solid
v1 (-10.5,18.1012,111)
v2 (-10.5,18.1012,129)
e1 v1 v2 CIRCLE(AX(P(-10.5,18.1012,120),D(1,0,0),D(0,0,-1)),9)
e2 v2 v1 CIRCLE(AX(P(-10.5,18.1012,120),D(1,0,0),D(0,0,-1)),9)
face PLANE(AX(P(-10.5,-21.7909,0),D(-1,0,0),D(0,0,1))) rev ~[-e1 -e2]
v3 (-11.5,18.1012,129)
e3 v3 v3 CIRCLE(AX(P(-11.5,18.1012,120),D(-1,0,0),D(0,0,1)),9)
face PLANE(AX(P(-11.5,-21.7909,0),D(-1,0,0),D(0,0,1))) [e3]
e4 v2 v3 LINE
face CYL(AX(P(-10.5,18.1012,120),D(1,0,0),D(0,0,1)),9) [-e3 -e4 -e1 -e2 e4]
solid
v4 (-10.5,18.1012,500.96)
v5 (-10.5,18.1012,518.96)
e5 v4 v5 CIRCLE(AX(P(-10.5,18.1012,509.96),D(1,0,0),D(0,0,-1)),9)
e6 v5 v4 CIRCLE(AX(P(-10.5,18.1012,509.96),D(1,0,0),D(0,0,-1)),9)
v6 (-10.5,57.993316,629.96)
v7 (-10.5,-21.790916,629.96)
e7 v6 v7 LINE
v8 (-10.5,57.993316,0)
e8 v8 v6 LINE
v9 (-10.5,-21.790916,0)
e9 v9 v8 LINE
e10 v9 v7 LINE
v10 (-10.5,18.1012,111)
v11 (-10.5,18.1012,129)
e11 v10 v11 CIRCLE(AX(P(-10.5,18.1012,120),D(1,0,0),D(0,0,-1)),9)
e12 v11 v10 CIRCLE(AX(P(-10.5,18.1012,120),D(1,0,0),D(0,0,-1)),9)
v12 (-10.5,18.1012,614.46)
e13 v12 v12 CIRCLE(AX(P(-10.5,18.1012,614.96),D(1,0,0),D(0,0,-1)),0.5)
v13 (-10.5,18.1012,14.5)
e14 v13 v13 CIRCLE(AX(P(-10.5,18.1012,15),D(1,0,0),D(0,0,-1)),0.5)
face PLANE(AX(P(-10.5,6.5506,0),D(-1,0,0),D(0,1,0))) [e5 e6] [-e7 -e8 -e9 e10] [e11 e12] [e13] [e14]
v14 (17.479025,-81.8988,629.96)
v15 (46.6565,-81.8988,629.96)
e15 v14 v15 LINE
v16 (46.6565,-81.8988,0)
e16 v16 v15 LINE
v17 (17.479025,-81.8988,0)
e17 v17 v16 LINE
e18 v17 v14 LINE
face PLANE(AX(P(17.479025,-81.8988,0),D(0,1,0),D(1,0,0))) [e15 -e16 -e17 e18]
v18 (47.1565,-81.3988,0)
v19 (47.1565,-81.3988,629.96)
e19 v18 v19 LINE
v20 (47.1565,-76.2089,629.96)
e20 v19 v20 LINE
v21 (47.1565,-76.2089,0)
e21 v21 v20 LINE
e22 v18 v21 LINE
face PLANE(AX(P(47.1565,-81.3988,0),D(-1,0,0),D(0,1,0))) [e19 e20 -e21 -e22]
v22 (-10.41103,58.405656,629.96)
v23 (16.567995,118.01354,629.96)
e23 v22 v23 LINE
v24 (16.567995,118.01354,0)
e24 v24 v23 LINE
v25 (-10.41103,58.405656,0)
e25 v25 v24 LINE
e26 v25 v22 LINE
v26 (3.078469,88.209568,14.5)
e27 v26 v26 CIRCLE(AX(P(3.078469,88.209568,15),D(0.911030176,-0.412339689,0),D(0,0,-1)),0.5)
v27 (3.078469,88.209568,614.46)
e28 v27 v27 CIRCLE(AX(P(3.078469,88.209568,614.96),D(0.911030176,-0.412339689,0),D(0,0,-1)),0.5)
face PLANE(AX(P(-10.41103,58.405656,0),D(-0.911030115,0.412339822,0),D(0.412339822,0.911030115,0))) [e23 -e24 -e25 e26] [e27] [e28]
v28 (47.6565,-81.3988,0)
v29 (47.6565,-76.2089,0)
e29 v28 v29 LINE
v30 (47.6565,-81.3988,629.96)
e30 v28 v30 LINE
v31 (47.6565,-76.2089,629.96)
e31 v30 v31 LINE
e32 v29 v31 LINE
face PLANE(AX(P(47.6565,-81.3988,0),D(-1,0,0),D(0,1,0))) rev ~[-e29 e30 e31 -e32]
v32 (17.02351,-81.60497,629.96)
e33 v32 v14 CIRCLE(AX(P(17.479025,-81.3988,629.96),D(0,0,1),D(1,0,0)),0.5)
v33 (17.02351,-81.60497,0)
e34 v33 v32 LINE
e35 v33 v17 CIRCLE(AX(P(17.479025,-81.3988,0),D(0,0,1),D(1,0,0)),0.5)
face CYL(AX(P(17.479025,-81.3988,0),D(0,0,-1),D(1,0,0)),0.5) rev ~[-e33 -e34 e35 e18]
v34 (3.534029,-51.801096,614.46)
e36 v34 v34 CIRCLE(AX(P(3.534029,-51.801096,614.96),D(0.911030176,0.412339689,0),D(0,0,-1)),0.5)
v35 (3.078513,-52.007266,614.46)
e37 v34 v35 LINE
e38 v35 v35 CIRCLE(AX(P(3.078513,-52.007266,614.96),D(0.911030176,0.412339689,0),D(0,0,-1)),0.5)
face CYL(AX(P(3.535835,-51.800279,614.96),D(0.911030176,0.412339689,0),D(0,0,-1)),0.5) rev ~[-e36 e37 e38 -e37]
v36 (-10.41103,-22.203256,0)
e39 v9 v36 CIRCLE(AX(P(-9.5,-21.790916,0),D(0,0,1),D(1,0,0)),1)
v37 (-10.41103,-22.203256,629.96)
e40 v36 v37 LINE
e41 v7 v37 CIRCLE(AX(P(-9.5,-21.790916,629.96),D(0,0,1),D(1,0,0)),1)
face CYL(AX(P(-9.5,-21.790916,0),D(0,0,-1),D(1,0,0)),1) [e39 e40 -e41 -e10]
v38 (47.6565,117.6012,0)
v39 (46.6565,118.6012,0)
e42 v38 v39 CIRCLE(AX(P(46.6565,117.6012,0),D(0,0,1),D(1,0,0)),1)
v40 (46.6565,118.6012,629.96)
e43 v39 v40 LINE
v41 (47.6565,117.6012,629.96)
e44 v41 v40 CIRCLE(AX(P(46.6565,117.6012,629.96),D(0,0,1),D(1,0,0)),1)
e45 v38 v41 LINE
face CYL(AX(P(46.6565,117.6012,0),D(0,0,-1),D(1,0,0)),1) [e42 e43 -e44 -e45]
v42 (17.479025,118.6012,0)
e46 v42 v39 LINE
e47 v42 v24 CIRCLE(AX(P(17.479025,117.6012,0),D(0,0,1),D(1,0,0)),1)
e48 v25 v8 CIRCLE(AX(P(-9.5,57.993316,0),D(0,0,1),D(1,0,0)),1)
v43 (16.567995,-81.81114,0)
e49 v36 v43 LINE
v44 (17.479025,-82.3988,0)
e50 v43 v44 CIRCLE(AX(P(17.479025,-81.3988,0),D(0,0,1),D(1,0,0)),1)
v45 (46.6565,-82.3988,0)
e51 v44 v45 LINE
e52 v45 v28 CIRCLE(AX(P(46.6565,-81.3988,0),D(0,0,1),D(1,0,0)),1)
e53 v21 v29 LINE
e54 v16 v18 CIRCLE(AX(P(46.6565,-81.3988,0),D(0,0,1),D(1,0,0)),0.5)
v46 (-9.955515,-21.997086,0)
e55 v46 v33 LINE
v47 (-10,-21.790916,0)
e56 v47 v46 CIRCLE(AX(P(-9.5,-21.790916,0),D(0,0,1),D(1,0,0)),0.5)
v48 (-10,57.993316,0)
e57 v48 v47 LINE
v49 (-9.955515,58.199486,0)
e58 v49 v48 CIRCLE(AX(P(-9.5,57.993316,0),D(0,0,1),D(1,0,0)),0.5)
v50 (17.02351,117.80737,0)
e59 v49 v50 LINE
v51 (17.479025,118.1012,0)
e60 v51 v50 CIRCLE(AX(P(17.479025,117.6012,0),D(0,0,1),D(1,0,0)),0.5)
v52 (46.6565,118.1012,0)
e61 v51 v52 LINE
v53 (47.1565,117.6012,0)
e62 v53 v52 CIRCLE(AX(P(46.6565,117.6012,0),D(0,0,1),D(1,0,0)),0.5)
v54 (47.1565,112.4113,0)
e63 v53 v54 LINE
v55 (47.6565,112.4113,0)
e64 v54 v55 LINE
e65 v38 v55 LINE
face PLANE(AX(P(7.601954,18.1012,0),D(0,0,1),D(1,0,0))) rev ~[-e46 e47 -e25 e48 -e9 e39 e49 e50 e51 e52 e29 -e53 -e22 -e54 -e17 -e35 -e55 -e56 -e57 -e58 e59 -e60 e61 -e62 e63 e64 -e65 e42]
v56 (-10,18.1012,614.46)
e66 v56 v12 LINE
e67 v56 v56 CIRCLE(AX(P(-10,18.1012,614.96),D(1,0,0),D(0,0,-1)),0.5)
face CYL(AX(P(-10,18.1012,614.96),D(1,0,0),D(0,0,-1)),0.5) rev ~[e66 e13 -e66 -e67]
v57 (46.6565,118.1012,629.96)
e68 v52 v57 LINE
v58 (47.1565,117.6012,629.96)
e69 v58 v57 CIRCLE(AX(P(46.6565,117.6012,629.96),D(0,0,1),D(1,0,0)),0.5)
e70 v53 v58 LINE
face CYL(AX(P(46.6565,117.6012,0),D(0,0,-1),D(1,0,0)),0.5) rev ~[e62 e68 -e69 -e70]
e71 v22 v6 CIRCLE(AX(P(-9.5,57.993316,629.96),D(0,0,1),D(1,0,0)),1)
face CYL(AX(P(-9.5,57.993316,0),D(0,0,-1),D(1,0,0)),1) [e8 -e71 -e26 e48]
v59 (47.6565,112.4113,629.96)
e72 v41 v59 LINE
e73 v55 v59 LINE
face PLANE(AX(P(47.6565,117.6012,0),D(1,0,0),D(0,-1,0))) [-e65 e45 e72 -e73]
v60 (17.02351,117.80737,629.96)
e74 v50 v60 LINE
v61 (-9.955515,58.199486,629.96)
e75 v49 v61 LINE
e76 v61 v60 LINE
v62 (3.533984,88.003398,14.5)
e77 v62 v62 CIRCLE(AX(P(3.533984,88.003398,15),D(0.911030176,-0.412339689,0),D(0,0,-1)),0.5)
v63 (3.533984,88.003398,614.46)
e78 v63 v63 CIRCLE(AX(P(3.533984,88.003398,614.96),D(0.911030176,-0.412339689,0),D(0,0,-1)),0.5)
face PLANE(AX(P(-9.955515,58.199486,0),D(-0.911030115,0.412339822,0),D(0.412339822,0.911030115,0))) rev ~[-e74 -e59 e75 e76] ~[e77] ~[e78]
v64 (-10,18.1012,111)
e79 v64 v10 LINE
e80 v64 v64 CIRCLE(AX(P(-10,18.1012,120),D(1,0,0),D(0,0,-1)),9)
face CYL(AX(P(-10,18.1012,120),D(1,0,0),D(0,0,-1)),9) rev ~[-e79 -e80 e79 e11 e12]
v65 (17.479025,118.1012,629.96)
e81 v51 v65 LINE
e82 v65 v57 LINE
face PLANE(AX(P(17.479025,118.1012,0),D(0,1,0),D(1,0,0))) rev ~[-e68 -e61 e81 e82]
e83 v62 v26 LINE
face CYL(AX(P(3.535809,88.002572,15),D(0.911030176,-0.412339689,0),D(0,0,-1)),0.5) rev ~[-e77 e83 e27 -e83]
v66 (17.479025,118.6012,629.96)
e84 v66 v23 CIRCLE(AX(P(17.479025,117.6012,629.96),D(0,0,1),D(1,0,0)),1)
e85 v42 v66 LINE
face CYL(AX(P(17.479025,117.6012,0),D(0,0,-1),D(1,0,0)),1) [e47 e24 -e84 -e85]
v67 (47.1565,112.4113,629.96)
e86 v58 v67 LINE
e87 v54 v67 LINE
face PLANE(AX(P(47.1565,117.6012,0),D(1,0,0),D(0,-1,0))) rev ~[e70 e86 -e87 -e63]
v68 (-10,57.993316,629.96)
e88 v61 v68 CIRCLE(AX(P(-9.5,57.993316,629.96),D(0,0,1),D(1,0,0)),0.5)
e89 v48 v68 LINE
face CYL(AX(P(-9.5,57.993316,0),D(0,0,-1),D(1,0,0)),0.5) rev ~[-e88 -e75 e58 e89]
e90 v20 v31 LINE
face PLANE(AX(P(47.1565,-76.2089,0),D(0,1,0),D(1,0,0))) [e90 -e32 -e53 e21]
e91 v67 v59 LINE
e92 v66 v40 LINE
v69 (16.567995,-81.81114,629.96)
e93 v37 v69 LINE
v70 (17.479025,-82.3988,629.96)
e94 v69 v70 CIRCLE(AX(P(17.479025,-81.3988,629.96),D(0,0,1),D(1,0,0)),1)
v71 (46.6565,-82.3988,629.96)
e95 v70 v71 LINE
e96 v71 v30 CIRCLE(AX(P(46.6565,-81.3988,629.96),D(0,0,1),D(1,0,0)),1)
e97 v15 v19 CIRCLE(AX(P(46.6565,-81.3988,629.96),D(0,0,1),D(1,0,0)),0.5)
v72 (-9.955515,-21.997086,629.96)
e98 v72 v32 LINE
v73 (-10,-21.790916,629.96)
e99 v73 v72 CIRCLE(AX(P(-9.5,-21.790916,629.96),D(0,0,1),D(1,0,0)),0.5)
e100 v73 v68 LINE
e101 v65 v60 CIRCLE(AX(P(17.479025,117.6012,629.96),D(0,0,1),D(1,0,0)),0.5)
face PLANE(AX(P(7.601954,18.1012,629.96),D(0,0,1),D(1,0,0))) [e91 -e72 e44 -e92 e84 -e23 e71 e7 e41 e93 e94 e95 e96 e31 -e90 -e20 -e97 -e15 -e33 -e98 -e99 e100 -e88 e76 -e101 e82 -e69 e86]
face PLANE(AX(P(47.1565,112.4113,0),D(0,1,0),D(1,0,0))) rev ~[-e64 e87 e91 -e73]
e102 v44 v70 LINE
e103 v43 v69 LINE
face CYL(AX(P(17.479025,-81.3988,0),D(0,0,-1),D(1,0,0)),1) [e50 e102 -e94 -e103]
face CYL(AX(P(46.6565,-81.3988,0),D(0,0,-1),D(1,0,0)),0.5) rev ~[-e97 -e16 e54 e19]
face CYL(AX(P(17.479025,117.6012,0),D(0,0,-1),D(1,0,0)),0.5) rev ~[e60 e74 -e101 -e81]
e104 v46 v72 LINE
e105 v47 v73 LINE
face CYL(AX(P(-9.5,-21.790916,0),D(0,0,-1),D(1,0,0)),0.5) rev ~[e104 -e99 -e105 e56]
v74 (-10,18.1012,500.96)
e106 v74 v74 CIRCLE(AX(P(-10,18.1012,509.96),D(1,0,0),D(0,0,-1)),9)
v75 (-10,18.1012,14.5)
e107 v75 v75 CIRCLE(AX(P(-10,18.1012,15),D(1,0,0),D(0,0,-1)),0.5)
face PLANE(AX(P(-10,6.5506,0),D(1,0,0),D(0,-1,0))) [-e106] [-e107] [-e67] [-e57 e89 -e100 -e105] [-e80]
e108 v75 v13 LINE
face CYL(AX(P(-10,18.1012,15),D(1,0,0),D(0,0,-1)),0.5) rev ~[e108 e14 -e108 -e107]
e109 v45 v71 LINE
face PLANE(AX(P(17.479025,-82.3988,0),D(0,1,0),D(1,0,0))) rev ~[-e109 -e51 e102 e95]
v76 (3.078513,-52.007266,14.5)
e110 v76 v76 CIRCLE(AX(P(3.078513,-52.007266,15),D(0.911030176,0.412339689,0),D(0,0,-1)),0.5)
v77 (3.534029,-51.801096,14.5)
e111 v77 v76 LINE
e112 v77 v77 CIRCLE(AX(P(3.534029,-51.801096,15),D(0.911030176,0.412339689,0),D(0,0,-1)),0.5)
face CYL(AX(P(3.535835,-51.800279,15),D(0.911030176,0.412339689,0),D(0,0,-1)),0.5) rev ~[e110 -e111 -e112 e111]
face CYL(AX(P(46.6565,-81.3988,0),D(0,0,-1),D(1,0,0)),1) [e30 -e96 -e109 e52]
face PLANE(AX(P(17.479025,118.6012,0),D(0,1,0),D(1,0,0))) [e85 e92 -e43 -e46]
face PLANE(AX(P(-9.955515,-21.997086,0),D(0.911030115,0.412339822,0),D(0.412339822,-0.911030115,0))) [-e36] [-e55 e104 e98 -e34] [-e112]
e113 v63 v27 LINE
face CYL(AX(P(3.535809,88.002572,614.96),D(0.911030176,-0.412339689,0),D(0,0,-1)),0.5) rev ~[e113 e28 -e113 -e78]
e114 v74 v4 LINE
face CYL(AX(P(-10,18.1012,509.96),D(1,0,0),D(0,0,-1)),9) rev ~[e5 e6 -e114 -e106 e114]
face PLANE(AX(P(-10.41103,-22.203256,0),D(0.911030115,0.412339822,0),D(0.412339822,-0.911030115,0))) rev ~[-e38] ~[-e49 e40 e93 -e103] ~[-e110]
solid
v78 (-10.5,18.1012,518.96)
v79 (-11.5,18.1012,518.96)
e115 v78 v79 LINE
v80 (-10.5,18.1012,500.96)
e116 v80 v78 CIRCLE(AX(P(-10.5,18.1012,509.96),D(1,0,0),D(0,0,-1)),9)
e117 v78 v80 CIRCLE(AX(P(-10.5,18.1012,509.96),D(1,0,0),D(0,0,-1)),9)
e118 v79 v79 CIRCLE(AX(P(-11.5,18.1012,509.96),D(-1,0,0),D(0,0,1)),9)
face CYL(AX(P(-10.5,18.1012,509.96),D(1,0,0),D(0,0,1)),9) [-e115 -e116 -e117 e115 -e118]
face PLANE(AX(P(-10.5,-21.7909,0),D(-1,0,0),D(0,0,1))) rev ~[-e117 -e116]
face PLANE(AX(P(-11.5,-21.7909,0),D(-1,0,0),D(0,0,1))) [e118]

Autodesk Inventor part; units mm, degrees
ref_plane "YZ Plane" through (0, 0, 0) normal (1, 0, 0) x (0, 1, 0)
ref_plane "XZ Plane" through (0, 0, 0) normal (0, 1, 0) x (-1, 0, 0)
ref_plane "XY Plane" through (0, 0, 0) normal (0, 0, 1) x (1, 0, 0)
sketch "Boceto1" plane through (0, 0, 0) normal (0, 0, 1) x (1, 0, 0)
  line L0 (-10, 6.5506) -> (-10, 58.1012)
  line L1 (-10, 58.1012) -> (17.1565, 118.1012)
  line L2 (17.1565, 118.1012) -> (47.1565, 118.1012)
  line L3 (47.1565, 118.1012) -> (47.1565, 112.4113)
  line L4 (-10, 6.5506) -> (-10, -21.8988)
  line L5 (-10, -21.8988) -> (17.1565, -81.8988)
  line L6 (17.1565, -81.8988) -> (47.1565, -81.8988)
  line L7 (47.1565, -81.8988) -> (47.1565, -76.2089)
  point P0 (47.1565, 115.2562)
  dimension "d22" = 60
  dimension "d23" = 60
  dimension "d24" = 30
  dimension "d25" = 30
  dimension "d26" = 200
  dimension "d44" = 57.1565
contour flange "Pestaña de contorno1" sketch "Boceto1" thickness 0.5 bend radius 0.5 width 629.96 along (0, 0, 1) mid plane no both sides no wall seen from (47.1565, 115.2562, 0) lies toward (1, 0, 0) curves L3 L2 L1 L0 L4 L5 L6 L7
bend "Doblez1"
corner "Esquina1"
sketch "Boceto2" plane through (-10, -21.7909, 629.96) normal (1, 0, 0) x (0, 0, -1)
  circle A0 centre (614.96, 39.8921) radius 0.5
  line L0 (629.96, 79.7842) -> (629.96, 0) projected
  circle A1 centre (15, 39.8921) radius 0.5
  line L1 (0, 0) -> (0, 79.7842) projected
  circle A2 centre (120, 39.8921) radius 9
  circle A3 centre (509.96, 39.8921) radius 9
  point P0 (629.96, 21.7909)
  point P1 (0, 39.8921)
  point P2 (629.96, 39.8921)
  dimension "d16" = 1
  dimension "d17" = 15
  dimension "d18" = 1
  dimension "d19" = 15
  dimension "d27" = 0
  dimension "d40" = 18
  dimension "d41" = 18
  dimension "d42" = 120
  dimension "d43" = 120
extrude "Extrusión1" cut sketch "Boceto2" against normal blind 10
sketch "Boceto3" plane through (-9.9555, 58.1995, 629.96) normal (0.9110302, -0.4123397, 0) x (0, 0, -1)
  circle A0 centre (15, 32.7145) radius 0.5
  line L0 (0, 0) -> (0, 65.4291) projected
  circle A1 centre (614.96, 32.7145) radius 0.5
  line L1 (629.96, 65.4291) -> (629.96, 0) projected
  point P0 (629.96, -48.9164)
  dimension "d28" = 1
  dimension "d29" = 15
  dimension "d30" = 1
  dimension "d31" = 15
extrude "Extrusión2" cut sketch "Boceto3" against normal blind 4.25
sketch "Boceto4" plane through (17.0235, -81.605, 629.96) normal (0.9110302, 0.4123397, 0) x (0, 0, -1)
  circle A0 centre (15, 32.7145) radius 0.5
  line L0 (0, 0) -> (0, 65.4291) projected
  circle A1 centre (614.96, 32.7145) radius 0.5
  line L1 (629.96, 65.4291) -> (629.96, 0) projected
  point P0 (629.96, 81.3641)
  point P1 (0, 32.7145)
  dimension "d34" = 1
  dimension "d35" = 15
  dimension "d36" = 1
  dimension "d37" = 15
extrude "Extrusión3" cut sketch "Boceto4" against normal blind 6
sketch "Boceto6" plane through (-10.5, -21.7909, 0) normal (-1, 0, 0) x (0, 0, 1)
  circle A0 centre (120, 39.8921) radius 9 projected
  circle A1 centre (120, 39.8921) radius 9
  circle A2 centre (509.96, 39.8921) radius 9 projected
  circle A3 centre (509.96, 39.8921) radius 9
  point P0 (0, 21.7909)
extrude "Extrusión4" add sketch "Boceto6" along normal blind 1
equation "\"d5\" = Grosor"
equation "\"d6\" = Anchura_desahogo_plegado"
equation "\"d7\" = Profundidad_desahogo_plegado"
equation "\"d8\" = Remanente_mínimo"
equation "\"d9\" = Radiodetransición"
equation "\"d11\" = Radio_pliegue"
equation "\"d13\" = Tamaño_destalonado"
equation "\"d14\" = TamañoSeparación"
equation "\"d15\" = Tamaño_de_radio_de_Jacobi"
equation "\"Radio_pliegue\" = Grosor"
equation "\"Remanente_mínimo\" = 2 * Grosor"
equation "\"TamañoSeparación\" = Grosor"
equation "\"Radiodetransición\" = Radio_pliegue"
equation "\"Tamaño_destalonado\" = 4 * Grosor"
equation "\"Anchura_desahogo_plegado\" = Grosor"
equation "\"Tamaño_de_radio_de_Jacobi\" = Radio_pliegue"
equation "\"Profundidad_desahogo_plegado\" = 0.5 * Grosor"
equation "\"Grosor\" = 0.5"
properties part number "Carcasa"
